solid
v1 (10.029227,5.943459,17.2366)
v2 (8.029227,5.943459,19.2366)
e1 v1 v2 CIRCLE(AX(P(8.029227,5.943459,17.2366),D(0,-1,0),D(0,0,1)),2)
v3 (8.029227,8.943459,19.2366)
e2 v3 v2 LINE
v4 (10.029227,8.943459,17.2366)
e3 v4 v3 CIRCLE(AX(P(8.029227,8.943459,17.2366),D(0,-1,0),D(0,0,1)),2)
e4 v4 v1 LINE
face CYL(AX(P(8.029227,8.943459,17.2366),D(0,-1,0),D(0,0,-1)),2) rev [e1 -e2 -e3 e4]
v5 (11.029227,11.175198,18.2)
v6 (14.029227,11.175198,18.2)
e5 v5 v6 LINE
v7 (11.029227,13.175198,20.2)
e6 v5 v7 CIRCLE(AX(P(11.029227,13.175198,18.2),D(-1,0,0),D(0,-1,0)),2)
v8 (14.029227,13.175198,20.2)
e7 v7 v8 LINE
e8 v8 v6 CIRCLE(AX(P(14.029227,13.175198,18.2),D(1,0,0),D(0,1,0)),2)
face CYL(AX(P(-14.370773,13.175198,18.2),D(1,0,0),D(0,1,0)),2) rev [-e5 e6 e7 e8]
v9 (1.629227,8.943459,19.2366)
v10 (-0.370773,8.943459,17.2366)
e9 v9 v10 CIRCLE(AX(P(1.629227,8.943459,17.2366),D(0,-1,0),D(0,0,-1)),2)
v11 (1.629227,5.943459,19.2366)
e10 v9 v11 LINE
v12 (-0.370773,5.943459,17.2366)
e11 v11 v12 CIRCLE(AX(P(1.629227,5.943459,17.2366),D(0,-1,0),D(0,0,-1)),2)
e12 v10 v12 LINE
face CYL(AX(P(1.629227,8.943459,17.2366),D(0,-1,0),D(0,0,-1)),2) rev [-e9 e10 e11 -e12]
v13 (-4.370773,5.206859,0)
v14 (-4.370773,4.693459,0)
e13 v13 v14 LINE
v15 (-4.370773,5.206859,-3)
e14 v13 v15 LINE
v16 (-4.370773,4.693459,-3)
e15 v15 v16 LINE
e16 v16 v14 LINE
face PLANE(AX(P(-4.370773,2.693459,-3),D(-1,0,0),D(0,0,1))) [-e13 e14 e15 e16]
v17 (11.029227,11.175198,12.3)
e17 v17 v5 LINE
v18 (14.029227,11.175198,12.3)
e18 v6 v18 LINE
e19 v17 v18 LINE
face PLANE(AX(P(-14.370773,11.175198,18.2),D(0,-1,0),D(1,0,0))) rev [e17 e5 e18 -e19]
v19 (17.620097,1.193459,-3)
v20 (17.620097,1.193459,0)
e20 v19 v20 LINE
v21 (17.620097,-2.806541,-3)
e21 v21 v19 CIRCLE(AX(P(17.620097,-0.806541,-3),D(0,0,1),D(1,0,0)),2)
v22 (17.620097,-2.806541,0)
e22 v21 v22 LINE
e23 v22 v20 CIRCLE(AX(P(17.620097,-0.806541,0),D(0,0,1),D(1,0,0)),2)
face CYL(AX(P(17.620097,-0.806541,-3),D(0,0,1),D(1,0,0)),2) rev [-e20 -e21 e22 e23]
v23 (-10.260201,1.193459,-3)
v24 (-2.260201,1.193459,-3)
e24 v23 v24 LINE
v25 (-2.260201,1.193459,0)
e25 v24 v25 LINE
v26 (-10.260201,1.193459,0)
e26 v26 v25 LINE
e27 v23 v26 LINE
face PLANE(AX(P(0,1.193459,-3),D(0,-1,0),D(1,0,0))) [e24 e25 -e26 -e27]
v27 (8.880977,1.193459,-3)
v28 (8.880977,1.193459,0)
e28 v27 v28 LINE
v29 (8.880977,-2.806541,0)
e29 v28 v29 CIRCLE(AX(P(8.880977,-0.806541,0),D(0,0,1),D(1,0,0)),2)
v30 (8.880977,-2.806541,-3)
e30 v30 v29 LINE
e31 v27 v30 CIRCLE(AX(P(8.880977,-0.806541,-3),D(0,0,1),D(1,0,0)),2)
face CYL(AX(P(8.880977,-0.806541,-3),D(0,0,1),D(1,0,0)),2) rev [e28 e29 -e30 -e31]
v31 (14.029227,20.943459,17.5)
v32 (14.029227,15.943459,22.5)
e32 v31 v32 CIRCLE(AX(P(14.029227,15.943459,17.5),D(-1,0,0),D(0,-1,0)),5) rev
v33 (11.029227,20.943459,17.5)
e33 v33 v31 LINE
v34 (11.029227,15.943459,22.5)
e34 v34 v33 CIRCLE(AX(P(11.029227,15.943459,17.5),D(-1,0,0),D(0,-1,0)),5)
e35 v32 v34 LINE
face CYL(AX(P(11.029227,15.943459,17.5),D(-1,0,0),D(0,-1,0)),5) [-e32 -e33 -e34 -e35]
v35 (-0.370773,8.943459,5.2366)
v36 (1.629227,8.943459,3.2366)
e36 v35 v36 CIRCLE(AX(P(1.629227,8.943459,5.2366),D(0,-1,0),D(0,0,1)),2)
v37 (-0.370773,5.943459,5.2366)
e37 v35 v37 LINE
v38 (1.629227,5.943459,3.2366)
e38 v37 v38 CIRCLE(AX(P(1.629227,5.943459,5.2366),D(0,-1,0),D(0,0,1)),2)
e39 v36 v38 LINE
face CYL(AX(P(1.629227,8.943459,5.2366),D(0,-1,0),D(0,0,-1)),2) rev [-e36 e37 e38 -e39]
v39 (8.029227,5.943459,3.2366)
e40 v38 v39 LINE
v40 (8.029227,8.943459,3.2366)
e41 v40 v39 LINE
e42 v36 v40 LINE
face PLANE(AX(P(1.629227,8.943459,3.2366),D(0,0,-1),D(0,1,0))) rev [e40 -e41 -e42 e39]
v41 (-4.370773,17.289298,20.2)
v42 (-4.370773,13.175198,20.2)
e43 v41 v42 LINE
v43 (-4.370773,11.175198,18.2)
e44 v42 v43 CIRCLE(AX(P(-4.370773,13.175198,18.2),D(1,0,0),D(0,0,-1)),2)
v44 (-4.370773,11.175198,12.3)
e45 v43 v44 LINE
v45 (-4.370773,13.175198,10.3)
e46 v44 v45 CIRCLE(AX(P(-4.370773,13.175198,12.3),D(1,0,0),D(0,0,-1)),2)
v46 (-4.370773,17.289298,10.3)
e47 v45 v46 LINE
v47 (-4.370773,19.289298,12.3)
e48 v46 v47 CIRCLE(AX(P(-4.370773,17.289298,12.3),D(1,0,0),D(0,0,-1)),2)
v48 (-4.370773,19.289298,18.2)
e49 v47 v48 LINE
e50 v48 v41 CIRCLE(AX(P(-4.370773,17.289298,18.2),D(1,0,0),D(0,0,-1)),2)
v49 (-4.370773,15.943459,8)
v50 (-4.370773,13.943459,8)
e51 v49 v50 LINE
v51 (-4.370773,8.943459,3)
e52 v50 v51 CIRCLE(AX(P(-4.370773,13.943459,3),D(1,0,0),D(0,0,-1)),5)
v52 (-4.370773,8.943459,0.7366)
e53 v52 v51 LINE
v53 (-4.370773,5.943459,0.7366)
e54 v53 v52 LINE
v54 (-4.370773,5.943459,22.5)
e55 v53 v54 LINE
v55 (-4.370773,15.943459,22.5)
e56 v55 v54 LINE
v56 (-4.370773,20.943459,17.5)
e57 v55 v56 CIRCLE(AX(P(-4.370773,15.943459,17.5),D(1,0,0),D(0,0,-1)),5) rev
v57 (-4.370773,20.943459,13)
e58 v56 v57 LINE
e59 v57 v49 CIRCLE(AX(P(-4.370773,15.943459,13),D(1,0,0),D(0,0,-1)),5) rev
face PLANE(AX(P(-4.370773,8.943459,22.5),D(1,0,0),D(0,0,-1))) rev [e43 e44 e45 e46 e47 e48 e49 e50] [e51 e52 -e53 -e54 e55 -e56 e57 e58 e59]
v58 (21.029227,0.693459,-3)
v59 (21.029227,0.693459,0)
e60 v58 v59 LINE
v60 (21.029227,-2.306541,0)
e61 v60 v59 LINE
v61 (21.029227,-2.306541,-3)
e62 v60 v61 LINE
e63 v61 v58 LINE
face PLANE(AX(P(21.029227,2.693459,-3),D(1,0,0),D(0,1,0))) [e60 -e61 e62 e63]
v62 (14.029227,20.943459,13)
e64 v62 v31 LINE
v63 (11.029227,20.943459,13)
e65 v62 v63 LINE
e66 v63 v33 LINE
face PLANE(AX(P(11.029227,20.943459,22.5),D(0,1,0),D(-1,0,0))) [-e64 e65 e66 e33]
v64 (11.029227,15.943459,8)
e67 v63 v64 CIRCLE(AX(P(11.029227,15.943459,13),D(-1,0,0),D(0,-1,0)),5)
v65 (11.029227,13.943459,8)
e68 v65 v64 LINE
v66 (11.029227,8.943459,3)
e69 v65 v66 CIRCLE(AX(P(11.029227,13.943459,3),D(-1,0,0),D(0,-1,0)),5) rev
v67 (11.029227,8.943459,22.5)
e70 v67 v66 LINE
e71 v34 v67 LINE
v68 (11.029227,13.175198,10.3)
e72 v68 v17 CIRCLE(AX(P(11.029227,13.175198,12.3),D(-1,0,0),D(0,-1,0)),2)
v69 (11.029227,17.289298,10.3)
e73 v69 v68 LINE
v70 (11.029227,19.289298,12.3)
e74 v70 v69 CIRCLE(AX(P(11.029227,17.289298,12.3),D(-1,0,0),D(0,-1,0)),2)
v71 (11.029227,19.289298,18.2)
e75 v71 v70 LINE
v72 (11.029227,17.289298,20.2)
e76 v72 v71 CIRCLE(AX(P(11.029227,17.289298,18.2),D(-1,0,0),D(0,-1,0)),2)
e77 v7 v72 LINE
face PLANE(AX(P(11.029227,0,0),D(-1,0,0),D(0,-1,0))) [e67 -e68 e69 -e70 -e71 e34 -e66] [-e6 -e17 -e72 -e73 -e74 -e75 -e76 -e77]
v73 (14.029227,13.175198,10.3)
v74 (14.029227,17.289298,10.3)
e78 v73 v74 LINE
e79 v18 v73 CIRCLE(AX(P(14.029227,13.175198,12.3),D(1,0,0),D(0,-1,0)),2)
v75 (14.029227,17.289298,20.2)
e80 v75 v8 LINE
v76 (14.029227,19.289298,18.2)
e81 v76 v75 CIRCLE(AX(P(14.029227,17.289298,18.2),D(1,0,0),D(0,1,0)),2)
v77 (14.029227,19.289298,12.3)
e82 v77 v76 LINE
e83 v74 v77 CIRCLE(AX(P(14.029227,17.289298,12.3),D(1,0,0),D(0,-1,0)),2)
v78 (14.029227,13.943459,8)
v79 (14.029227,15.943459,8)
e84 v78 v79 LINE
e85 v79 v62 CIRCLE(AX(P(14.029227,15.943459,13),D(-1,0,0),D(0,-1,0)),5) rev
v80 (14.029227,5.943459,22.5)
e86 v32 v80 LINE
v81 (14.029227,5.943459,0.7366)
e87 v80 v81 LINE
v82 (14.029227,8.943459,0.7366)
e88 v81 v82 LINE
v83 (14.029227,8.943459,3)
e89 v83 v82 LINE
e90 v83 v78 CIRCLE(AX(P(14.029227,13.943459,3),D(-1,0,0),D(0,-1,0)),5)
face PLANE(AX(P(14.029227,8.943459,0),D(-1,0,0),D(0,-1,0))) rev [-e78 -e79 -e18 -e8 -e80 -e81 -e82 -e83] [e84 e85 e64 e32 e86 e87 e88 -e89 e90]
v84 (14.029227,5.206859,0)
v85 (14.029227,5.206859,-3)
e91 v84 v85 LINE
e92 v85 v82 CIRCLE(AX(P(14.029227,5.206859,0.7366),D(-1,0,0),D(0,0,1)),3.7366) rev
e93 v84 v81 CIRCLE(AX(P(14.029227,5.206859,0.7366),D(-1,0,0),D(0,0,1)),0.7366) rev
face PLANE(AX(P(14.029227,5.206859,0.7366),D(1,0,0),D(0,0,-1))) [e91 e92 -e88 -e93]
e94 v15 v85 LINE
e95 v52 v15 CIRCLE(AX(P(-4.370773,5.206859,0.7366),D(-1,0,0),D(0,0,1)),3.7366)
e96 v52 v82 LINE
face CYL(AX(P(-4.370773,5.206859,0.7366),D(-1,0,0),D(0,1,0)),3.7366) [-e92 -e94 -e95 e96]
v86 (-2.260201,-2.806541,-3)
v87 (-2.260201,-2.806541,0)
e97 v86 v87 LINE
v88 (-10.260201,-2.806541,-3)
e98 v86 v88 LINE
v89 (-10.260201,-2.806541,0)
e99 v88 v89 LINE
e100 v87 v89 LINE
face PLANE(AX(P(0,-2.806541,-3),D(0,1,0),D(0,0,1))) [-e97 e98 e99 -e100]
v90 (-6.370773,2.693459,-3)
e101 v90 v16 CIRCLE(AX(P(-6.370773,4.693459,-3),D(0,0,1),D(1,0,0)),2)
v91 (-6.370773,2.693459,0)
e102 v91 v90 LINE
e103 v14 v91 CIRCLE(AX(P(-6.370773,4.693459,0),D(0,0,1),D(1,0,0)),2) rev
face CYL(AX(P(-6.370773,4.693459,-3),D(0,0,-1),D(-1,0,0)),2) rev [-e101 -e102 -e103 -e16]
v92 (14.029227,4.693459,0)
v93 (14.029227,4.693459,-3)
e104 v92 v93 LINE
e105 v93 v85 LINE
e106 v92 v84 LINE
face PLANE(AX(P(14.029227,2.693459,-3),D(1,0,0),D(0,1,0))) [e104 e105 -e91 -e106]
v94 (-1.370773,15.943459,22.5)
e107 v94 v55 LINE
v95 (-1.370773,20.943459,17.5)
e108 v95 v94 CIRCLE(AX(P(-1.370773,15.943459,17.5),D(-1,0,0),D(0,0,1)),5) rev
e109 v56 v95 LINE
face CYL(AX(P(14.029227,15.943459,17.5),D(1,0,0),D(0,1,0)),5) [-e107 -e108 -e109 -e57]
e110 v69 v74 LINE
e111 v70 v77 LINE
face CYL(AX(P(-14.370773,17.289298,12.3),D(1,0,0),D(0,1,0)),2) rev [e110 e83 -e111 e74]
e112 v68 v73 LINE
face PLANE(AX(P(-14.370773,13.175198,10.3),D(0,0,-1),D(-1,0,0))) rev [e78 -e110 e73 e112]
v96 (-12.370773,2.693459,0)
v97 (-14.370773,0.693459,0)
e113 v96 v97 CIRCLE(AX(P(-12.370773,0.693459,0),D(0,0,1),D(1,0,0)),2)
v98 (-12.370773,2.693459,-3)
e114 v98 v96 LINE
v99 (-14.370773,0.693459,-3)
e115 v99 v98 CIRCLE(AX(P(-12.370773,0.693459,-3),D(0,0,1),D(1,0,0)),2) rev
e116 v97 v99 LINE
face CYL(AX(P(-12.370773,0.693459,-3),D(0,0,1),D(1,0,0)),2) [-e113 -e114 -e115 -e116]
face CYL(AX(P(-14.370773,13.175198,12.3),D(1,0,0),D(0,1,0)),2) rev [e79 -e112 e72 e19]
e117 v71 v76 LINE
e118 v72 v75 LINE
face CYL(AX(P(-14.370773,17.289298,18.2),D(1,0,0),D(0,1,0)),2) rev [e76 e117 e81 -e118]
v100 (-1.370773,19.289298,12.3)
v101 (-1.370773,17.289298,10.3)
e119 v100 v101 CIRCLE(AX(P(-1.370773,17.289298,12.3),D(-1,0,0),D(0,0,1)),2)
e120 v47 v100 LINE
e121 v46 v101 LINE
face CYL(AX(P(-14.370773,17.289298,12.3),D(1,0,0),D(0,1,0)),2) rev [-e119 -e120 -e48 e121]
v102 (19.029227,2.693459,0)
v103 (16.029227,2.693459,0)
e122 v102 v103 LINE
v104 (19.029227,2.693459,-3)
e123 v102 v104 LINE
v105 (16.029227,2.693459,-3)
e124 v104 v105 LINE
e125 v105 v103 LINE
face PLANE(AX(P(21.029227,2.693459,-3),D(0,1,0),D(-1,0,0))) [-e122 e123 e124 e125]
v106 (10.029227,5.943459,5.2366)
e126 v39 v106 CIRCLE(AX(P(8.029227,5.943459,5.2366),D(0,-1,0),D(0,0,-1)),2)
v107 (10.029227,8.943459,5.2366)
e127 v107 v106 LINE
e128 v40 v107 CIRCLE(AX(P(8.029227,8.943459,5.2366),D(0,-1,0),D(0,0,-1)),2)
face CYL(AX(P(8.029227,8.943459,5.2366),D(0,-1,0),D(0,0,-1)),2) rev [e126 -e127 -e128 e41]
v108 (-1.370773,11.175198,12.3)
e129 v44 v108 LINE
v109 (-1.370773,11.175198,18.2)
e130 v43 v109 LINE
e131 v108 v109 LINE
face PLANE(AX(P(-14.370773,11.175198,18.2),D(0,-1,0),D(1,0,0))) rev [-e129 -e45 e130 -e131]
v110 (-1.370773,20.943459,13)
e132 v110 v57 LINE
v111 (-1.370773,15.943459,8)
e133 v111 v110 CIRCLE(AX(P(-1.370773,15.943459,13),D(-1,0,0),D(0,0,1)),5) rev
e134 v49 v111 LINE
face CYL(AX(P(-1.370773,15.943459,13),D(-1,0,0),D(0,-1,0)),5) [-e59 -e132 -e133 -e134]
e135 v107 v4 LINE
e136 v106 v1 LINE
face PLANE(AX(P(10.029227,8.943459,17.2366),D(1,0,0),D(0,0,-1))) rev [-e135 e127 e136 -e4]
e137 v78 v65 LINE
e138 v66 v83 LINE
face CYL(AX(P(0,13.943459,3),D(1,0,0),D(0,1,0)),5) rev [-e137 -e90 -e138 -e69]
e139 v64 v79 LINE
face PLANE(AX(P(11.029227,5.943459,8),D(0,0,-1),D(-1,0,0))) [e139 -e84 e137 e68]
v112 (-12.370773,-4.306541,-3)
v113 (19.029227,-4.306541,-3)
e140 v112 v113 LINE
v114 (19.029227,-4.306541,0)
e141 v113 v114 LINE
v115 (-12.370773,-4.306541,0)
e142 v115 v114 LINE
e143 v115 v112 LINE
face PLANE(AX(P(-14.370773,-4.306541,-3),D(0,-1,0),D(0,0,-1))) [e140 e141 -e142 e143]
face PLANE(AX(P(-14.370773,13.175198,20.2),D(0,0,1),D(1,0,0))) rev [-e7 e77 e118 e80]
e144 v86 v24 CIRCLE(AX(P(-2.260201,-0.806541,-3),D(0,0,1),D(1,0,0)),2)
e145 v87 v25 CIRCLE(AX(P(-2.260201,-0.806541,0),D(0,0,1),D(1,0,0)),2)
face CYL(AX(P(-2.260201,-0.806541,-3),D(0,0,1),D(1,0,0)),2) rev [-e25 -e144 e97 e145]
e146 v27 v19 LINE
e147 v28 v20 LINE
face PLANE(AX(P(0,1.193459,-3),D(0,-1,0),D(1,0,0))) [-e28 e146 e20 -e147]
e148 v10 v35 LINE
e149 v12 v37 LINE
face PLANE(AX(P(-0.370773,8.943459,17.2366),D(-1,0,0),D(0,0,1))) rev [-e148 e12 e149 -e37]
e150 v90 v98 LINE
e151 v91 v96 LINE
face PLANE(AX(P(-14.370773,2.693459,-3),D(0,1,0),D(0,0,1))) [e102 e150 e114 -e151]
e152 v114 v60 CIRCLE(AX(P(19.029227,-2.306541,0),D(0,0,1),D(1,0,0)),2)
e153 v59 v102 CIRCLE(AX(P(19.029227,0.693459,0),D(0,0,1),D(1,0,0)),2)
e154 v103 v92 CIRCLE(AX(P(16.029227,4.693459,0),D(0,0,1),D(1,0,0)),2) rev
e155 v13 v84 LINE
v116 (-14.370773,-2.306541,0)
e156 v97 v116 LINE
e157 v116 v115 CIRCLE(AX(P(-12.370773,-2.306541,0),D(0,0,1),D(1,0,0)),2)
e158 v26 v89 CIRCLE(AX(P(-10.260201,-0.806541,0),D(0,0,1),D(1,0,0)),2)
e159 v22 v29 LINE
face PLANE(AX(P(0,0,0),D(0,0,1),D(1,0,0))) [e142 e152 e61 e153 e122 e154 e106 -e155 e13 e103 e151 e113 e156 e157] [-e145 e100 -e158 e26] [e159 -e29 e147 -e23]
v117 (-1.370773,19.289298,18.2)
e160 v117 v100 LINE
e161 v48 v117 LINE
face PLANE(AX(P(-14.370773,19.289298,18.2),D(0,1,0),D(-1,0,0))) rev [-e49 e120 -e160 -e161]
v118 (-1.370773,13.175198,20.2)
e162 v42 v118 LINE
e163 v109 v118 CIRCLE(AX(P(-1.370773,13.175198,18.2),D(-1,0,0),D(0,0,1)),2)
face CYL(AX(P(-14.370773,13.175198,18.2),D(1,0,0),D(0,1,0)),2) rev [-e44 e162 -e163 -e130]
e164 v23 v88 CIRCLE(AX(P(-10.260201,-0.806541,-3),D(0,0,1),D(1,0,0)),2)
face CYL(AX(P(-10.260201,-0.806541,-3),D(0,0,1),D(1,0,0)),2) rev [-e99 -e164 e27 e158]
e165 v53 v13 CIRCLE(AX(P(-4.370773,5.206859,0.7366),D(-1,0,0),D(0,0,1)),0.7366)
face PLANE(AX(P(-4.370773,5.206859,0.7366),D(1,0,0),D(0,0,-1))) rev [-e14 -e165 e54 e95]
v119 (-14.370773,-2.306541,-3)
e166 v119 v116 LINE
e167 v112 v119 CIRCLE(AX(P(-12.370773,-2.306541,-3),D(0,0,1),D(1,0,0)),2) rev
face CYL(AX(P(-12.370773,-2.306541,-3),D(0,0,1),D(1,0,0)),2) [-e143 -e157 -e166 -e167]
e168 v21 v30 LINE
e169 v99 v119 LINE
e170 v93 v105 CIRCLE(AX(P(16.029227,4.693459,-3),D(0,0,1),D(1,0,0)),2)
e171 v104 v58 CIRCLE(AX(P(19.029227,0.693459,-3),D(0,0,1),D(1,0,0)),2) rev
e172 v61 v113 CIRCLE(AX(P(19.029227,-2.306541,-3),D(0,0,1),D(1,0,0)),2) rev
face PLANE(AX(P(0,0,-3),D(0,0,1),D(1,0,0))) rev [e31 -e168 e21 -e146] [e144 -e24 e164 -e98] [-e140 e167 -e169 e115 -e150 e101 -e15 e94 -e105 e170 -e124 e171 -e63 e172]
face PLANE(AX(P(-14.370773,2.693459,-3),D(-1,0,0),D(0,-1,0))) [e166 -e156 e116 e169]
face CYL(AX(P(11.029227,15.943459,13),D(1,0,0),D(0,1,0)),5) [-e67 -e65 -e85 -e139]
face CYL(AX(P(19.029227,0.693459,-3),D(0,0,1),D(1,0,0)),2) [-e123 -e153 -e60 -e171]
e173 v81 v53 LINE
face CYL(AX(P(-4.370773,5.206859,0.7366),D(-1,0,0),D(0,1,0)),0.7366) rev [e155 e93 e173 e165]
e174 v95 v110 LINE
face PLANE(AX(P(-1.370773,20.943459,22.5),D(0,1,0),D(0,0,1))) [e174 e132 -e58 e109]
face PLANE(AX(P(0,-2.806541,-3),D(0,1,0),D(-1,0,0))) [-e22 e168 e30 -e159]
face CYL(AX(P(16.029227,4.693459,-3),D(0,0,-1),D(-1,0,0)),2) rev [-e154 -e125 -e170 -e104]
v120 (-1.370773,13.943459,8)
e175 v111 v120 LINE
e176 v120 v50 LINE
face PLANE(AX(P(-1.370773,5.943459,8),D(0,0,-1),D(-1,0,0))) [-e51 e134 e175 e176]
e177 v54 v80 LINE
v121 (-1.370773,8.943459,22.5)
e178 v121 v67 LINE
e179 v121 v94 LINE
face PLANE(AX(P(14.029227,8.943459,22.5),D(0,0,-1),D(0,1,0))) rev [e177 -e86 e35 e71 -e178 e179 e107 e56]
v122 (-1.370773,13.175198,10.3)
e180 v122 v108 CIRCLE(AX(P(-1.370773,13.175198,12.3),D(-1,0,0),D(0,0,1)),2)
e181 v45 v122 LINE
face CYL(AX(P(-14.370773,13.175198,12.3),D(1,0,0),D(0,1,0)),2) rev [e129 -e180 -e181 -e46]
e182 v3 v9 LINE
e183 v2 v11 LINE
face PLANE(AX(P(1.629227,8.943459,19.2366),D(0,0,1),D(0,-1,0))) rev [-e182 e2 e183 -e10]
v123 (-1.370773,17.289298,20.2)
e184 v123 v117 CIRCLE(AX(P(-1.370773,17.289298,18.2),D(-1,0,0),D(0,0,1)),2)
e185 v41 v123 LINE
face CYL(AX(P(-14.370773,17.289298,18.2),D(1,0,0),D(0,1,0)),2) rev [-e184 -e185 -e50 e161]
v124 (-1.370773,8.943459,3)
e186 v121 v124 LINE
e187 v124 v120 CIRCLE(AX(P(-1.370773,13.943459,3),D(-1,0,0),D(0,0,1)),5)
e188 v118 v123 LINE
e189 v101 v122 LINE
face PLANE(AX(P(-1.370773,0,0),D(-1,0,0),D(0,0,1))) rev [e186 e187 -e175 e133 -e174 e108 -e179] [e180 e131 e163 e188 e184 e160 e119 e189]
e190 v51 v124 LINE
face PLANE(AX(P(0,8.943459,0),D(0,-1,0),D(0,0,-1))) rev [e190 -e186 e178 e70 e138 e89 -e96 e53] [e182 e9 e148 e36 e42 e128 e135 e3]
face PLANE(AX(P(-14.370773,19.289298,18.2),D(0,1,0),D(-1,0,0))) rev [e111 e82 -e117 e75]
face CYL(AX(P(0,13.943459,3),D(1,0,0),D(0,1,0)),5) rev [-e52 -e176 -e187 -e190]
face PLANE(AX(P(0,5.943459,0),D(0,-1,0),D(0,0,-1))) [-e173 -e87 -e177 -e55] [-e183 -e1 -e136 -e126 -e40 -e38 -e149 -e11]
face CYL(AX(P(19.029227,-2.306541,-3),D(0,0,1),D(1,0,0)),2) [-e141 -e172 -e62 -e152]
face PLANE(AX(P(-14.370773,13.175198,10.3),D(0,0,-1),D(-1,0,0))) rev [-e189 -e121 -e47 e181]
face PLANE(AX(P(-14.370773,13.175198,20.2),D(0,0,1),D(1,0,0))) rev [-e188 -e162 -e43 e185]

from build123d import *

# Parameters (mm, degrees)
FLANGE_BASE1_DEPTH             = 3
CORTE_EXTRUS_O1_DEPTH          = 3
ARESTA_FLANGE4_STRIP_W         = 13.4732
ARESTA_FLANGE4_STRIP_H         = 3
ARESTA_FLANGE4_STRIP_CUT_DEPTH = 18.4
ARESTA_FLANGE4_DEPTH           = 18.4
ESBO_O47_W                     = 14.5
ESBO_O47_H                     = 15
RESSALTO_EXTRUS_O1_DEPTH       = 3
FILETE1_R                      = 5
ESBO_O48_W                     = 14.5
ESBO_O48_H                     = 15
RESSALTO_EXTRUS_O2_DEPTH       = 3
FILETE2_R                      = 5
FILETE3_R                      = 2
CORTE_EXTRUS_O5_DEPTH          = 42.850190918
CORTE_EXTRUS_O6_DEPTH          = 3


# Sheet-metal steps are written as plain solids
with BuildPart() as part:
    # Esboço1 → Flange-base1 (new body)
    with BuildSketch(Plane.XY):
        Polygon((-14.370772566, 2.693459119), (-4.370772566, 2.693459119), (-4.370772566, 5.943459119), (14.029227434, 5.943459119), (14.029227434, 2.693459119), (21.029227434, 2.693459119), (21.029227434, -4.306540881), (-14.370772566, -4.306540881), align=None)
    extrude(amount=-FLANGE_BASE1_DEPTH)

    # Esboço8 → Corte-extrusão1 (cut)
    with BuildSketch(Plane.XY):
        with BuildLine():
            Line((-10.260200759, 1.193459119), (-2.260200759, 1.193459119))
            ThreePointArc((-2.260200759, 1.193459119), (-0.260200759, -0.806540881), (-2.260200759, -2.806540881))
            Line((-2.260200759, -2.806540881), (-10.260200759, -2.806540881))
            ThreePointArc((-10.260200759, -2.806540881), (-12.260200759, -0.806540881), (-10.260200759, 1.193459119))
        make_face()
        with BuildLine():
            Line((8.88097681, 1.193459119), (17.620096532, 1.193459119))
            ThreePointArc((17.620096532, 1.193459119), (19.620096532, -0.806540881), (17.620096532, -2.806540881))
            Line((17.620096532, -2.806540881), (8.88097681, -2.806540881))
            ThreePointArc((8.88097681, -2.806540881), (6.88097681, -0.806540881), (8.88097681, 1.193459119))
        make_face()
    extrude(amount=-CORTE_EXTRUS_O1_DEPTH, mode=Mode.SUBTRACT)

    # Aresta-Flange4 strip (across the edge) → Aresta-Flange4 strip cut (cut)
    with BuildSketch(Plane(origin=(14.029227434, 5.943459119, 0), x_dir=(0, -1, 0), z_dir=(-1, 0, 0))):
        with Locations((-6, -1.5)):
            Rectangle(ARESTA_FLANGE4_STRIP_W, ARESTA_FLANGE4_STRIP_H)
    extrude(amount=ARESTA_FLANGE4_STRIP_CUT_DEPTH, mode=Mode.SUBTRACT)

    # Aresta-Flange4 section (across the edge) → Aresta-Flange4 (add)
    with BuildSketch(Plane(origin=(14.029227434, 5.943459119, 0), x_dir=(0, -1, 0), z_dir=(-1, 0, 0))):
        with BuildLine():
            Line((-3, 0.7366), (-3, 22.5))
            Line((-3, 22.5), (0, 22.5))
            Line((0, 22.5), (0, 0.7366))
            ThreePointArc((0, 0.7366), (0.215745145, 0.215745145), (0.7366, 0))
            Line((0.7366, 0), (0.7366, -3))
            ThreePointArc((0.7366, -3), (-1.905575199, -1.905575199), (-3, 0.7366))
        make_face()
    extrude(amount=ARESTA_FLANGE4_DEPTH)

    # Esboço47 → Ressalto-extrusão1 (add)
    with BuildSketch(Plane(origin=(14.029227434, 0, 0), x_dir=(0, 0, -1), z_dir=(1, 0, 0))):
        with Locations((-15.25, 13.443459119)):
            Rectangle(ESBO_O47_W, ESBO_O47_H)
    extrude(amount=-RESSALTO_EXTRUS_O1_DEPTH)

    # Filete1
    filete1_edges = [part.edges().sort_by_distance(p)[0] for p in [
        (12.529227434, 20.943459119, 22.5),
        (12.529227434, 8.943459119, 8),
        (12.529227434, 20.943459119, 8),
    ]]
    fillet(filete1_edges, radius=FILETE1_R)

    # Esboço48 → Ressalto-extrusão2 (add)
    with BuildSketch(Plane.ZY.offset(4.370772566)):
        with Locations((15.25, 13.443459119)):
            Rectangle(ESBO_O48_W, ESBO_O48_H)
    extrude(amount=-RESSALTO_EXTRUS_O2_DEPTH)

    # Filete2
    filete2_edges = [part.edges().sort_by_distance(p)[0] for p in [
        (-2.870772566, 20.943459119, 22.5),
        (-2.870772566, 8.943459119, 8),
        (-2.870772566, 20.943459119, 8),
    ]]
    fillet(filete2_edges, radius=FILETE2_R)

    # Filete3
    filete3_edges = [part.edges().sort_by_distance(p)[0] for p in [
        (21.029227434, -4.306540881, -1.5),
        (-14.370772566, -4.306540881, -1.5),
        (-14.370772566, 2.693459119, -1.5),
        (-4.370772566, 2.693459119, -1.5),
        (14.029227434, 2.693459119, -1.5),
        (21.029227434, 2.693459119, -1.5),
    ]]
    fillet(filete3_edges, radius=FILETE3_R)

    # Esboço49 → Corte-extrusão5 (cut, through all)
    with BuildSketch(Plane(origin=(14.029227434, 0, 0), x_dir=(0, 0, -1), z_dir=(1, 0, 0))):
        with BuildLine():
            Line((-18.2, 11.175198381), (-12.3, 11.175198381))
            ThreePointArc((-12.3, 11.175198381), (-10.885786438, 11.760984819), (-10.3, 13.175198381))
            Line((-10.3, 13.175198381), (-10.3, 17.289297618))
            ThreePointArc((-10.3, 17.289297618), (-10.885786438, 18.70351118), (-12.3, 19.289297618))
            Line((-12.3, 19.289297618), (-18.2, 19.289297618))
            ThreePointArc((-18.2, 19.289297618), (-19.614213562, 18.70351118), (-20.2, 17.289297618))
            Line((-20.2, 17.289297618), (-20.2, 13.175198381))
            ThreePointArc((-20.2, 13.175198381), (-19.614213562, 11.760984819), (-18.2, 11.175198381))
        make_face()
    extrude(amount=-CORTE_EXTRUS_O5_DEPTH, mode=Mode.SUBTRACT)

    # Esboço50 → Corte-extrusão6 (cut)
    with BuildSketch(Plane.XZ.offset(-5.943459119)):
        with BuildLine():
            Line((1.629227434, 19.2366), (8.029227434, 19.2366))
            ThreePointArc((8.029227434, 19.2366), (9.443440996, 18.650813562), (10.029227434, 17.2366))
            Line((10.029227434, 17.2366), (10.029227434, 5.2366))
            ThreePointArc((10.029227434, 5.2366), (9.443440996, 3.822386438), (8.029227434, 3.2366))
            Line((8.029227434, 3.2366), (1.629227434, 3.2366))
            ThreePointArc((1.629227434, 3.2366), (0.215013871, 3.822386438), (-0.370772566, 5.2366))
            Line((-0.370772566, 5.2366), (-0.370772566, 17.2366))
            ThreePointArc((-0.370772566, 17.2366), (0.215013871, 18.650813562), (1.629227434, 19.2366))
        make_face()
    extrude(amount=-CORTE_EXTRUS_O6_DEPTH, mode=Mode.SUBTRACT)


solid = part.part
